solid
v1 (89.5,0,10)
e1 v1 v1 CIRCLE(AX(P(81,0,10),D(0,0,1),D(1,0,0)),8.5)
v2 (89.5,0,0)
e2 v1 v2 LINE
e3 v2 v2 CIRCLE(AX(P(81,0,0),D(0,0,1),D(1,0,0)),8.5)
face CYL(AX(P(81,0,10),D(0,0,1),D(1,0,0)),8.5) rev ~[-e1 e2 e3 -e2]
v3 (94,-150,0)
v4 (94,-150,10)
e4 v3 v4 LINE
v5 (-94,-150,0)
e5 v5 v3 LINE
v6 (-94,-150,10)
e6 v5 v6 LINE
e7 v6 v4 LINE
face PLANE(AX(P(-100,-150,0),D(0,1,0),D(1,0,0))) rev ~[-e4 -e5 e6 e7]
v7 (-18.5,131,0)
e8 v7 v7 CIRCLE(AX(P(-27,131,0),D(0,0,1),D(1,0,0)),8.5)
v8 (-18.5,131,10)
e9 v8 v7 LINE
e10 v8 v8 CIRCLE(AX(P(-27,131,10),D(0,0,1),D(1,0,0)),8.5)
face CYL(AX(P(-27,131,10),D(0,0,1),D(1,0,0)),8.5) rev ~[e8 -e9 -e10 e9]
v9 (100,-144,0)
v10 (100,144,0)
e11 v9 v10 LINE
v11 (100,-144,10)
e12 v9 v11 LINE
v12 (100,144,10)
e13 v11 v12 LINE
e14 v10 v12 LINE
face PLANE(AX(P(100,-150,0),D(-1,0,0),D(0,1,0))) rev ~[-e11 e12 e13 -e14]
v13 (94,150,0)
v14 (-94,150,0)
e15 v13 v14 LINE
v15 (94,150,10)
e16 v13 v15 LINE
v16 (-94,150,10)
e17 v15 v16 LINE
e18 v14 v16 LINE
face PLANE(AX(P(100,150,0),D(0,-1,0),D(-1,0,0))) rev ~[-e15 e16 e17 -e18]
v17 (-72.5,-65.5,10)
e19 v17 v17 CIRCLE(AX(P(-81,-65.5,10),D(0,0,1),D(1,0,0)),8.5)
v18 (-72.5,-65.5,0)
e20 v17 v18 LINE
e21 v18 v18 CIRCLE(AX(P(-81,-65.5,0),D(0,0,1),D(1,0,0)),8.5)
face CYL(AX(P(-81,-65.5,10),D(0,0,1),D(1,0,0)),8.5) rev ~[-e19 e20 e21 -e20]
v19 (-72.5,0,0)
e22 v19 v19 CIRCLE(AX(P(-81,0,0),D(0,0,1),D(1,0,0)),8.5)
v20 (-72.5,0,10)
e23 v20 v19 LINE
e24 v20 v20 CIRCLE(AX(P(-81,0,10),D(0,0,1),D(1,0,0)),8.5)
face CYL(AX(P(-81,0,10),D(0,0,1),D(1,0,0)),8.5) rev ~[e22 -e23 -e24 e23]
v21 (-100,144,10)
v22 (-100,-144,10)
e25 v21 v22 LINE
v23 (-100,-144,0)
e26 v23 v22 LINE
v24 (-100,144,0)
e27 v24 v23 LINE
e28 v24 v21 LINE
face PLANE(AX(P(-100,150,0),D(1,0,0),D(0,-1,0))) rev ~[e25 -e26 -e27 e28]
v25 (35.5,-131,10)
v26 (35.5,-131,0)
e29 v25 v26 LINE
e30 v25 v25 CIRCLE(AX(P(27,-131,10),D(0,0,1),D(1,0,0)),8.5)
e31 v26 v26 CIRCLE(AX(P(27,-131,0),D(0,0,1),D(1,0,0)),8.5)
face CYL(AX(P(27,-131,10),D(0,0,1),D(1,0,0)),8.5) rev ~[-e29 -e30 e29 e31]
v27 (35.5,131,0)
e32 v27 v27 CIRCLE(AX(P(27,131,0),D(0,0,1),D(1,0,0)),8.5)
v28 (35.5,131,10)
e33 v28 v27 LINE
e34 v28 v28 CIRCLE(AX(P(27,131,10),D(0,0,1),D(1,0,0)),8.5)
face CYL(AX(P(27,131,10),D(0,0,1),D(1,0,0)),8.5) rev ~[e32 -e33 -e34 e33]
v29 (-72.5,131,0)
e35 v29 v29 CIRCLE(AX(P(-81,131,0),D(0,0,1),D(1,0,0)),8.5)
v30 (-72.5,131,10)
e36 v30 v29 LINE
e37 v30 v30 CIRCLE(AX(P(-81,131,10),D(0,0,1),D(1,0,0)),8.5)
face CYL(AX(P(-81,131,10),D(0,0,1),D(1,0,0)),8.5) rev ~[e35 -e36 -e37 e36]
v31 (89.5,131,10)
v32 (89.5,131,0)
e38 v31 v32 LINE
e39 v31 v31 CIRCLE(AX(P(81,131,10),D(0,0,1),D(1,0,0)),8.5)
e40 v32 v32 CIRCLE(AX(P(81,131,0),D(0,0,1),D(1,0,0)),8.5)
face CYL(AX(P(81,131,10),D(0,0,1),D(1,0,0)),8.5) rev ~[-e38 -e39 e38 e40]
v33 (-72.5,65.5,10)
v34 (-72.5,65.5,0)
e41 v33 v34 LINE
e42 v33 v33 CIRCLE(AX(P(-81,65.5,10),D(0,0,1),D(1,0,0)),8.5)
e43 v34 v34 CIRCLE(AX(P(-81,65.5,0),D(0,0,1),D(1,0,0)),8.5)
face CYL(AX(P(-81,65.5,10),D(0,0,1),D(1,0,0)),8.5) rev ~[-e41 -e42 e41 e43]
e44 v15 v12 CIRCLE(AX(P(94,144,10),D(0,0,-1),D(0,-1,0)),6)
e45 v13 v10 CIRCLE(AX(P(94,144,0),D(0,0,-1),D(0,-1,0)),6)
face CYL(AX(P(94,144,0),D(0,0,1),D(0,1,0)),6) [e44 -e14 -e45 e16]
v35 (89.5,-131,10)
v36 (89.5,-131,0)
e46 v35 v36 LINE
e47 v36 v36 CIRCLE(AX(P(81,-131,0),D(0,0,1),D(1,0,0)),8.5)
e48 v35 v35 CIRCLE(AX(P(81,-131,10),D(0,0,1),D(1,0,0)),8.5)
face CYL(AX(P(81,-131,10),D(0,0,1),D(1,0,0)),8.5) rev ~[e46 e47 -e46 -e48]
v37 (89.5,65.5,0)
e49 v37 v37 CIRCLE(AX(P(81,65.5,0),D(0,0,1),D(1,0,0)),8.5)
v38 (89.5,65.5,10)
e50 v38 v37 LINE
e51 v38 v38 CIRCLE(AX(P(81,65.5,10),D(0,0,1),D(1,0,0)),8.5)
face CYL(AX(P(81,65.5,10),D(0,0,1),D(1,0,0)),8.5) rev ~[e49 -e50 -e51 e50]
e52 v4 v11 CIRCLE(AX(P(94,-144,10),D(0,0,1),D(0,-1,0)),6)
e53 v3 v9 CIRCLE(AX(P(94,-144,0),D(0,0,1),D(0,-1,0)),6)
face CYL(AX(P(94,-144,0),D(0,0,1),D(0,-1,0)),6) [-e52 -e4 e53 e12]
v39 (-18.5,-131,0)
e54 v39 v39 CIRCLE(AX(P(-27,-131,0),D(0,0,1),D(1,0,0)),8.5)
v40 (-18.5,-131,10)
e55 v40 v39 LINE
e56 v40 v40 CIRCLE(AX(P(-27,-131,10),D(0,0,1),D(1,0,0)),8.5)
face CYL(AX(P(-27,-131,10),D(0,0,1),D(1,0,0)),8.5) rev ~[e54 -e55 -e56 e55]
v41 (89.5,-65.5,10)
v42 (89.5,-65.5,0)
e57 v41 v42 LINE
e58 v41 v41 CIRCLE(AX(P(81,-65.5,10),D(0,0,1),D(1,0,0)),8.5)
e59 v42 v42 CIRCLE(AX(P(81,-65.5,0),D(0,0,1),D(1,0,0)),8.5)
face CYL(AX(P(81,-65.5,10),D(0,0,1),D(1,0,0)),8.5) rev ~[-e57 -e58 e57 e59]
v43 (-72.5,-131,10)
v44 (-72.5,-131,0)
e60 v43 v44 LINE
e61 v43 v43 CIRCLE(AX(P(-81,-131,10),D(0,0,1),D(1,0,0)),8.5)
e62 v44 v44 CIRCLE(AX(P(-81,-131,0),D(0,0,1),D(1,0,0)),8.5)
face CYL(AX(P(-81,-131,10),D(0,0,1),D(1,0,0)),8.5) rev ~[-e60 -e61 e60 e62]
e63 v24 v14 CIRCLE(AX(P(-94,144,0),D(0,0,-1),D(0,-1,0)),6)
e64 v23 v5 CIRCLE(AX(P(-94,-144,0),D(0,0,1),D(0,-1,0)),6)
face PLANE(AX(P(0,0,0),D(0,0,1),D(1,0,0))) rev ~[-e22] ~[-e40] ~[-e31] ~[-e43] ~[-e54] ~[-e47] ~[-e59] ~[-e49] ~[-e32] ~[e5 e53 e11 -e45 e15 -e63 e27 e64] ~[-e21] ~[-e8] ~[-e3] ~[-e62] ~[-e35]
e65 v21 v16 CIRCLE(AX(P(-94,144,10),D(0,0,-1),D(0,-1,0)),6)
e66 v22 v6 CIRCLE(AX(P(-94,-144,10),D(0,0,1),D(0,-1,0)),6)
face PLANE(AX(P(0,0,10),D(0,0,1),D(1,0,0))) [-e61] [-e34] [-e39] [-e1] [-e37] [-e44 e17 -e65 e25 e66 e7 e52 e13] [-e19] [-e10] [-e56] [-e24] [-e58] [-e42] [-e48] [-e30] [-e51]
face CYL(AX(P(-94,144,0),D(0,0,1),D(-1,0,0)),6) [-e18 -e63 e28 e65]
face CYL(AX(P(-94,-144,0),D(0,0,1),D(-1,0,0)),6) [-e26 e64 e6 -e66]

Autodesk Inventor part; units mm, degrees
ref_plane "YZ Plane" through (0, 0, 0) normal (1, 0, 0) x (0, 1, 0)
ref_plane "XZ Plane" through (0, 0, 0) normal (0, 1, 0) x (-1, 0, 0)
ref_plane "XY Plane" through (0, 0, 0) normal (0, 0, 1) x (1, 0, 0)
sketch "Sketch2" plane through (0, 0, 0) normal (0, 0, 1) x (1, 0, 0)
  line L0 (-50, -100) -> (50, -100)
  line L1 (50, -100) -> (50, 100)
  line L2 (50, 100) -> (-50, 100)
  line L3 (-50, 100) -> (-50, -100)
  line L4 (-50, -100) -> (50, 100) construction
  line L5 (50, -100) -> (-50, 100) construction
  line L6 (-100, -150) -> (100, -150)
  line L7 (100, -150) -> (100, 150)
  line L8 (100, 150) -> (-100, 150)
  line L9 (-100, 150) -> (-100, -150)
  point P0 (0, 0)
  dimension "d29" = 100
  dimension "d30" = 200
  dimension "d31" = 50
extrude "Plate2" add sketch "Sketch2" along normal blind 10 contours L3 L2 L1 L0 | L9 L8 L7 L6
sketch "Sketch5" plane through (0, 0, 10) normal (0, 0, 1) x (1, 0, 0)
  line L0 (100, -150) -> (-100, -150) construction
  line L1 (100, 150) -> (100, -150) construction
  line L2 (-100, 150) -> (100, 150) construction
  line L3 (-100, -150) -> (-100, 150) construction
  line L4 (-81, 131) -> (81, 131) construction
  line L5 (81, 131) -> (81, -131) construction
  line L6 (81, -131) -> (-81, -131) construction
  line L7 (-81, -131) -> (-81, 131) construction
  circle A0 centre (-81, -131) radius 8.5
  circle A1 centre (-81, 131) radius 8.5
  circle A2 centre (-81, 0) radius 8.5
  circle A3 centre (-81, -65.5) radius 8.5
  circle A4 centre (-81, 65.5) radius 8.5
  line L8 (-50, 0) -> (50, 0) construction
  circle A5 centre (-27, -131) radius 8.5
  circle A6 centre (-27, -65.5) radius 8.5
  circle A7 centre (-27, 0) radius 8.5
  circle A8 centre (-27, 65.5) radius 8.5
  circle A9 centre (-27, 131) radius 8.5
  circle A10 centre (27, -131) radius 8.5
  circle A11 centre (27, -65.5) radius 8.5
  circle A12 centre (27, 0) radius 8.5
  circle A13 centre (27, 65.5) radius 8.5
  circle A14 centre (27, 131) radius 8.5
  circle A15 centre (81, -131) radius 8.5
  circle A16 centre (81, -65.5) radius 8.5
  circle A17 centre (81, 0) radius 8.5
  circle A18 centre (81, 65.5) radius 8.5
  circle A19 centre (81, 131) radius 8.5
  point P0 (0, 0)
  point P1 (0, -131)
  dimension "d33" = 17
  dimension "d34" = 19
  dimension "d35" = 65.5
  dimension "d36" = 65.5
  dimension "d39" = 54
extrude "Cut3" cut sketch "Sketch5" against normal blind 10 contours A0 | A1 | A2 | A3 | A4 | A5 | A9 | A10 | A14 | A15 | A16 | A17 | A18 | A19
fillet "Corner Round1" radius 6 4 edges at (-100, -150, 5) (-100, 150, 5) (100, 150, 5) (100, -150, 5)
equation "\"d35\" = d36"
equation "\"d44\" = Thickness"
equation "\"d14\" = Thickness"
equation "\"BendReliefDepth\" = 0.5 * Thickness"
equation "\"TransitionRadius\" = BendRadius"
equation "\"JacobiRadiusSize\" = BendRadius"
equation "\"Thickness\" = 10"
equation "\"BendRadius\" = 6"
properties part number "PNS 1607 charging flange rect_1200" material "Steel"
